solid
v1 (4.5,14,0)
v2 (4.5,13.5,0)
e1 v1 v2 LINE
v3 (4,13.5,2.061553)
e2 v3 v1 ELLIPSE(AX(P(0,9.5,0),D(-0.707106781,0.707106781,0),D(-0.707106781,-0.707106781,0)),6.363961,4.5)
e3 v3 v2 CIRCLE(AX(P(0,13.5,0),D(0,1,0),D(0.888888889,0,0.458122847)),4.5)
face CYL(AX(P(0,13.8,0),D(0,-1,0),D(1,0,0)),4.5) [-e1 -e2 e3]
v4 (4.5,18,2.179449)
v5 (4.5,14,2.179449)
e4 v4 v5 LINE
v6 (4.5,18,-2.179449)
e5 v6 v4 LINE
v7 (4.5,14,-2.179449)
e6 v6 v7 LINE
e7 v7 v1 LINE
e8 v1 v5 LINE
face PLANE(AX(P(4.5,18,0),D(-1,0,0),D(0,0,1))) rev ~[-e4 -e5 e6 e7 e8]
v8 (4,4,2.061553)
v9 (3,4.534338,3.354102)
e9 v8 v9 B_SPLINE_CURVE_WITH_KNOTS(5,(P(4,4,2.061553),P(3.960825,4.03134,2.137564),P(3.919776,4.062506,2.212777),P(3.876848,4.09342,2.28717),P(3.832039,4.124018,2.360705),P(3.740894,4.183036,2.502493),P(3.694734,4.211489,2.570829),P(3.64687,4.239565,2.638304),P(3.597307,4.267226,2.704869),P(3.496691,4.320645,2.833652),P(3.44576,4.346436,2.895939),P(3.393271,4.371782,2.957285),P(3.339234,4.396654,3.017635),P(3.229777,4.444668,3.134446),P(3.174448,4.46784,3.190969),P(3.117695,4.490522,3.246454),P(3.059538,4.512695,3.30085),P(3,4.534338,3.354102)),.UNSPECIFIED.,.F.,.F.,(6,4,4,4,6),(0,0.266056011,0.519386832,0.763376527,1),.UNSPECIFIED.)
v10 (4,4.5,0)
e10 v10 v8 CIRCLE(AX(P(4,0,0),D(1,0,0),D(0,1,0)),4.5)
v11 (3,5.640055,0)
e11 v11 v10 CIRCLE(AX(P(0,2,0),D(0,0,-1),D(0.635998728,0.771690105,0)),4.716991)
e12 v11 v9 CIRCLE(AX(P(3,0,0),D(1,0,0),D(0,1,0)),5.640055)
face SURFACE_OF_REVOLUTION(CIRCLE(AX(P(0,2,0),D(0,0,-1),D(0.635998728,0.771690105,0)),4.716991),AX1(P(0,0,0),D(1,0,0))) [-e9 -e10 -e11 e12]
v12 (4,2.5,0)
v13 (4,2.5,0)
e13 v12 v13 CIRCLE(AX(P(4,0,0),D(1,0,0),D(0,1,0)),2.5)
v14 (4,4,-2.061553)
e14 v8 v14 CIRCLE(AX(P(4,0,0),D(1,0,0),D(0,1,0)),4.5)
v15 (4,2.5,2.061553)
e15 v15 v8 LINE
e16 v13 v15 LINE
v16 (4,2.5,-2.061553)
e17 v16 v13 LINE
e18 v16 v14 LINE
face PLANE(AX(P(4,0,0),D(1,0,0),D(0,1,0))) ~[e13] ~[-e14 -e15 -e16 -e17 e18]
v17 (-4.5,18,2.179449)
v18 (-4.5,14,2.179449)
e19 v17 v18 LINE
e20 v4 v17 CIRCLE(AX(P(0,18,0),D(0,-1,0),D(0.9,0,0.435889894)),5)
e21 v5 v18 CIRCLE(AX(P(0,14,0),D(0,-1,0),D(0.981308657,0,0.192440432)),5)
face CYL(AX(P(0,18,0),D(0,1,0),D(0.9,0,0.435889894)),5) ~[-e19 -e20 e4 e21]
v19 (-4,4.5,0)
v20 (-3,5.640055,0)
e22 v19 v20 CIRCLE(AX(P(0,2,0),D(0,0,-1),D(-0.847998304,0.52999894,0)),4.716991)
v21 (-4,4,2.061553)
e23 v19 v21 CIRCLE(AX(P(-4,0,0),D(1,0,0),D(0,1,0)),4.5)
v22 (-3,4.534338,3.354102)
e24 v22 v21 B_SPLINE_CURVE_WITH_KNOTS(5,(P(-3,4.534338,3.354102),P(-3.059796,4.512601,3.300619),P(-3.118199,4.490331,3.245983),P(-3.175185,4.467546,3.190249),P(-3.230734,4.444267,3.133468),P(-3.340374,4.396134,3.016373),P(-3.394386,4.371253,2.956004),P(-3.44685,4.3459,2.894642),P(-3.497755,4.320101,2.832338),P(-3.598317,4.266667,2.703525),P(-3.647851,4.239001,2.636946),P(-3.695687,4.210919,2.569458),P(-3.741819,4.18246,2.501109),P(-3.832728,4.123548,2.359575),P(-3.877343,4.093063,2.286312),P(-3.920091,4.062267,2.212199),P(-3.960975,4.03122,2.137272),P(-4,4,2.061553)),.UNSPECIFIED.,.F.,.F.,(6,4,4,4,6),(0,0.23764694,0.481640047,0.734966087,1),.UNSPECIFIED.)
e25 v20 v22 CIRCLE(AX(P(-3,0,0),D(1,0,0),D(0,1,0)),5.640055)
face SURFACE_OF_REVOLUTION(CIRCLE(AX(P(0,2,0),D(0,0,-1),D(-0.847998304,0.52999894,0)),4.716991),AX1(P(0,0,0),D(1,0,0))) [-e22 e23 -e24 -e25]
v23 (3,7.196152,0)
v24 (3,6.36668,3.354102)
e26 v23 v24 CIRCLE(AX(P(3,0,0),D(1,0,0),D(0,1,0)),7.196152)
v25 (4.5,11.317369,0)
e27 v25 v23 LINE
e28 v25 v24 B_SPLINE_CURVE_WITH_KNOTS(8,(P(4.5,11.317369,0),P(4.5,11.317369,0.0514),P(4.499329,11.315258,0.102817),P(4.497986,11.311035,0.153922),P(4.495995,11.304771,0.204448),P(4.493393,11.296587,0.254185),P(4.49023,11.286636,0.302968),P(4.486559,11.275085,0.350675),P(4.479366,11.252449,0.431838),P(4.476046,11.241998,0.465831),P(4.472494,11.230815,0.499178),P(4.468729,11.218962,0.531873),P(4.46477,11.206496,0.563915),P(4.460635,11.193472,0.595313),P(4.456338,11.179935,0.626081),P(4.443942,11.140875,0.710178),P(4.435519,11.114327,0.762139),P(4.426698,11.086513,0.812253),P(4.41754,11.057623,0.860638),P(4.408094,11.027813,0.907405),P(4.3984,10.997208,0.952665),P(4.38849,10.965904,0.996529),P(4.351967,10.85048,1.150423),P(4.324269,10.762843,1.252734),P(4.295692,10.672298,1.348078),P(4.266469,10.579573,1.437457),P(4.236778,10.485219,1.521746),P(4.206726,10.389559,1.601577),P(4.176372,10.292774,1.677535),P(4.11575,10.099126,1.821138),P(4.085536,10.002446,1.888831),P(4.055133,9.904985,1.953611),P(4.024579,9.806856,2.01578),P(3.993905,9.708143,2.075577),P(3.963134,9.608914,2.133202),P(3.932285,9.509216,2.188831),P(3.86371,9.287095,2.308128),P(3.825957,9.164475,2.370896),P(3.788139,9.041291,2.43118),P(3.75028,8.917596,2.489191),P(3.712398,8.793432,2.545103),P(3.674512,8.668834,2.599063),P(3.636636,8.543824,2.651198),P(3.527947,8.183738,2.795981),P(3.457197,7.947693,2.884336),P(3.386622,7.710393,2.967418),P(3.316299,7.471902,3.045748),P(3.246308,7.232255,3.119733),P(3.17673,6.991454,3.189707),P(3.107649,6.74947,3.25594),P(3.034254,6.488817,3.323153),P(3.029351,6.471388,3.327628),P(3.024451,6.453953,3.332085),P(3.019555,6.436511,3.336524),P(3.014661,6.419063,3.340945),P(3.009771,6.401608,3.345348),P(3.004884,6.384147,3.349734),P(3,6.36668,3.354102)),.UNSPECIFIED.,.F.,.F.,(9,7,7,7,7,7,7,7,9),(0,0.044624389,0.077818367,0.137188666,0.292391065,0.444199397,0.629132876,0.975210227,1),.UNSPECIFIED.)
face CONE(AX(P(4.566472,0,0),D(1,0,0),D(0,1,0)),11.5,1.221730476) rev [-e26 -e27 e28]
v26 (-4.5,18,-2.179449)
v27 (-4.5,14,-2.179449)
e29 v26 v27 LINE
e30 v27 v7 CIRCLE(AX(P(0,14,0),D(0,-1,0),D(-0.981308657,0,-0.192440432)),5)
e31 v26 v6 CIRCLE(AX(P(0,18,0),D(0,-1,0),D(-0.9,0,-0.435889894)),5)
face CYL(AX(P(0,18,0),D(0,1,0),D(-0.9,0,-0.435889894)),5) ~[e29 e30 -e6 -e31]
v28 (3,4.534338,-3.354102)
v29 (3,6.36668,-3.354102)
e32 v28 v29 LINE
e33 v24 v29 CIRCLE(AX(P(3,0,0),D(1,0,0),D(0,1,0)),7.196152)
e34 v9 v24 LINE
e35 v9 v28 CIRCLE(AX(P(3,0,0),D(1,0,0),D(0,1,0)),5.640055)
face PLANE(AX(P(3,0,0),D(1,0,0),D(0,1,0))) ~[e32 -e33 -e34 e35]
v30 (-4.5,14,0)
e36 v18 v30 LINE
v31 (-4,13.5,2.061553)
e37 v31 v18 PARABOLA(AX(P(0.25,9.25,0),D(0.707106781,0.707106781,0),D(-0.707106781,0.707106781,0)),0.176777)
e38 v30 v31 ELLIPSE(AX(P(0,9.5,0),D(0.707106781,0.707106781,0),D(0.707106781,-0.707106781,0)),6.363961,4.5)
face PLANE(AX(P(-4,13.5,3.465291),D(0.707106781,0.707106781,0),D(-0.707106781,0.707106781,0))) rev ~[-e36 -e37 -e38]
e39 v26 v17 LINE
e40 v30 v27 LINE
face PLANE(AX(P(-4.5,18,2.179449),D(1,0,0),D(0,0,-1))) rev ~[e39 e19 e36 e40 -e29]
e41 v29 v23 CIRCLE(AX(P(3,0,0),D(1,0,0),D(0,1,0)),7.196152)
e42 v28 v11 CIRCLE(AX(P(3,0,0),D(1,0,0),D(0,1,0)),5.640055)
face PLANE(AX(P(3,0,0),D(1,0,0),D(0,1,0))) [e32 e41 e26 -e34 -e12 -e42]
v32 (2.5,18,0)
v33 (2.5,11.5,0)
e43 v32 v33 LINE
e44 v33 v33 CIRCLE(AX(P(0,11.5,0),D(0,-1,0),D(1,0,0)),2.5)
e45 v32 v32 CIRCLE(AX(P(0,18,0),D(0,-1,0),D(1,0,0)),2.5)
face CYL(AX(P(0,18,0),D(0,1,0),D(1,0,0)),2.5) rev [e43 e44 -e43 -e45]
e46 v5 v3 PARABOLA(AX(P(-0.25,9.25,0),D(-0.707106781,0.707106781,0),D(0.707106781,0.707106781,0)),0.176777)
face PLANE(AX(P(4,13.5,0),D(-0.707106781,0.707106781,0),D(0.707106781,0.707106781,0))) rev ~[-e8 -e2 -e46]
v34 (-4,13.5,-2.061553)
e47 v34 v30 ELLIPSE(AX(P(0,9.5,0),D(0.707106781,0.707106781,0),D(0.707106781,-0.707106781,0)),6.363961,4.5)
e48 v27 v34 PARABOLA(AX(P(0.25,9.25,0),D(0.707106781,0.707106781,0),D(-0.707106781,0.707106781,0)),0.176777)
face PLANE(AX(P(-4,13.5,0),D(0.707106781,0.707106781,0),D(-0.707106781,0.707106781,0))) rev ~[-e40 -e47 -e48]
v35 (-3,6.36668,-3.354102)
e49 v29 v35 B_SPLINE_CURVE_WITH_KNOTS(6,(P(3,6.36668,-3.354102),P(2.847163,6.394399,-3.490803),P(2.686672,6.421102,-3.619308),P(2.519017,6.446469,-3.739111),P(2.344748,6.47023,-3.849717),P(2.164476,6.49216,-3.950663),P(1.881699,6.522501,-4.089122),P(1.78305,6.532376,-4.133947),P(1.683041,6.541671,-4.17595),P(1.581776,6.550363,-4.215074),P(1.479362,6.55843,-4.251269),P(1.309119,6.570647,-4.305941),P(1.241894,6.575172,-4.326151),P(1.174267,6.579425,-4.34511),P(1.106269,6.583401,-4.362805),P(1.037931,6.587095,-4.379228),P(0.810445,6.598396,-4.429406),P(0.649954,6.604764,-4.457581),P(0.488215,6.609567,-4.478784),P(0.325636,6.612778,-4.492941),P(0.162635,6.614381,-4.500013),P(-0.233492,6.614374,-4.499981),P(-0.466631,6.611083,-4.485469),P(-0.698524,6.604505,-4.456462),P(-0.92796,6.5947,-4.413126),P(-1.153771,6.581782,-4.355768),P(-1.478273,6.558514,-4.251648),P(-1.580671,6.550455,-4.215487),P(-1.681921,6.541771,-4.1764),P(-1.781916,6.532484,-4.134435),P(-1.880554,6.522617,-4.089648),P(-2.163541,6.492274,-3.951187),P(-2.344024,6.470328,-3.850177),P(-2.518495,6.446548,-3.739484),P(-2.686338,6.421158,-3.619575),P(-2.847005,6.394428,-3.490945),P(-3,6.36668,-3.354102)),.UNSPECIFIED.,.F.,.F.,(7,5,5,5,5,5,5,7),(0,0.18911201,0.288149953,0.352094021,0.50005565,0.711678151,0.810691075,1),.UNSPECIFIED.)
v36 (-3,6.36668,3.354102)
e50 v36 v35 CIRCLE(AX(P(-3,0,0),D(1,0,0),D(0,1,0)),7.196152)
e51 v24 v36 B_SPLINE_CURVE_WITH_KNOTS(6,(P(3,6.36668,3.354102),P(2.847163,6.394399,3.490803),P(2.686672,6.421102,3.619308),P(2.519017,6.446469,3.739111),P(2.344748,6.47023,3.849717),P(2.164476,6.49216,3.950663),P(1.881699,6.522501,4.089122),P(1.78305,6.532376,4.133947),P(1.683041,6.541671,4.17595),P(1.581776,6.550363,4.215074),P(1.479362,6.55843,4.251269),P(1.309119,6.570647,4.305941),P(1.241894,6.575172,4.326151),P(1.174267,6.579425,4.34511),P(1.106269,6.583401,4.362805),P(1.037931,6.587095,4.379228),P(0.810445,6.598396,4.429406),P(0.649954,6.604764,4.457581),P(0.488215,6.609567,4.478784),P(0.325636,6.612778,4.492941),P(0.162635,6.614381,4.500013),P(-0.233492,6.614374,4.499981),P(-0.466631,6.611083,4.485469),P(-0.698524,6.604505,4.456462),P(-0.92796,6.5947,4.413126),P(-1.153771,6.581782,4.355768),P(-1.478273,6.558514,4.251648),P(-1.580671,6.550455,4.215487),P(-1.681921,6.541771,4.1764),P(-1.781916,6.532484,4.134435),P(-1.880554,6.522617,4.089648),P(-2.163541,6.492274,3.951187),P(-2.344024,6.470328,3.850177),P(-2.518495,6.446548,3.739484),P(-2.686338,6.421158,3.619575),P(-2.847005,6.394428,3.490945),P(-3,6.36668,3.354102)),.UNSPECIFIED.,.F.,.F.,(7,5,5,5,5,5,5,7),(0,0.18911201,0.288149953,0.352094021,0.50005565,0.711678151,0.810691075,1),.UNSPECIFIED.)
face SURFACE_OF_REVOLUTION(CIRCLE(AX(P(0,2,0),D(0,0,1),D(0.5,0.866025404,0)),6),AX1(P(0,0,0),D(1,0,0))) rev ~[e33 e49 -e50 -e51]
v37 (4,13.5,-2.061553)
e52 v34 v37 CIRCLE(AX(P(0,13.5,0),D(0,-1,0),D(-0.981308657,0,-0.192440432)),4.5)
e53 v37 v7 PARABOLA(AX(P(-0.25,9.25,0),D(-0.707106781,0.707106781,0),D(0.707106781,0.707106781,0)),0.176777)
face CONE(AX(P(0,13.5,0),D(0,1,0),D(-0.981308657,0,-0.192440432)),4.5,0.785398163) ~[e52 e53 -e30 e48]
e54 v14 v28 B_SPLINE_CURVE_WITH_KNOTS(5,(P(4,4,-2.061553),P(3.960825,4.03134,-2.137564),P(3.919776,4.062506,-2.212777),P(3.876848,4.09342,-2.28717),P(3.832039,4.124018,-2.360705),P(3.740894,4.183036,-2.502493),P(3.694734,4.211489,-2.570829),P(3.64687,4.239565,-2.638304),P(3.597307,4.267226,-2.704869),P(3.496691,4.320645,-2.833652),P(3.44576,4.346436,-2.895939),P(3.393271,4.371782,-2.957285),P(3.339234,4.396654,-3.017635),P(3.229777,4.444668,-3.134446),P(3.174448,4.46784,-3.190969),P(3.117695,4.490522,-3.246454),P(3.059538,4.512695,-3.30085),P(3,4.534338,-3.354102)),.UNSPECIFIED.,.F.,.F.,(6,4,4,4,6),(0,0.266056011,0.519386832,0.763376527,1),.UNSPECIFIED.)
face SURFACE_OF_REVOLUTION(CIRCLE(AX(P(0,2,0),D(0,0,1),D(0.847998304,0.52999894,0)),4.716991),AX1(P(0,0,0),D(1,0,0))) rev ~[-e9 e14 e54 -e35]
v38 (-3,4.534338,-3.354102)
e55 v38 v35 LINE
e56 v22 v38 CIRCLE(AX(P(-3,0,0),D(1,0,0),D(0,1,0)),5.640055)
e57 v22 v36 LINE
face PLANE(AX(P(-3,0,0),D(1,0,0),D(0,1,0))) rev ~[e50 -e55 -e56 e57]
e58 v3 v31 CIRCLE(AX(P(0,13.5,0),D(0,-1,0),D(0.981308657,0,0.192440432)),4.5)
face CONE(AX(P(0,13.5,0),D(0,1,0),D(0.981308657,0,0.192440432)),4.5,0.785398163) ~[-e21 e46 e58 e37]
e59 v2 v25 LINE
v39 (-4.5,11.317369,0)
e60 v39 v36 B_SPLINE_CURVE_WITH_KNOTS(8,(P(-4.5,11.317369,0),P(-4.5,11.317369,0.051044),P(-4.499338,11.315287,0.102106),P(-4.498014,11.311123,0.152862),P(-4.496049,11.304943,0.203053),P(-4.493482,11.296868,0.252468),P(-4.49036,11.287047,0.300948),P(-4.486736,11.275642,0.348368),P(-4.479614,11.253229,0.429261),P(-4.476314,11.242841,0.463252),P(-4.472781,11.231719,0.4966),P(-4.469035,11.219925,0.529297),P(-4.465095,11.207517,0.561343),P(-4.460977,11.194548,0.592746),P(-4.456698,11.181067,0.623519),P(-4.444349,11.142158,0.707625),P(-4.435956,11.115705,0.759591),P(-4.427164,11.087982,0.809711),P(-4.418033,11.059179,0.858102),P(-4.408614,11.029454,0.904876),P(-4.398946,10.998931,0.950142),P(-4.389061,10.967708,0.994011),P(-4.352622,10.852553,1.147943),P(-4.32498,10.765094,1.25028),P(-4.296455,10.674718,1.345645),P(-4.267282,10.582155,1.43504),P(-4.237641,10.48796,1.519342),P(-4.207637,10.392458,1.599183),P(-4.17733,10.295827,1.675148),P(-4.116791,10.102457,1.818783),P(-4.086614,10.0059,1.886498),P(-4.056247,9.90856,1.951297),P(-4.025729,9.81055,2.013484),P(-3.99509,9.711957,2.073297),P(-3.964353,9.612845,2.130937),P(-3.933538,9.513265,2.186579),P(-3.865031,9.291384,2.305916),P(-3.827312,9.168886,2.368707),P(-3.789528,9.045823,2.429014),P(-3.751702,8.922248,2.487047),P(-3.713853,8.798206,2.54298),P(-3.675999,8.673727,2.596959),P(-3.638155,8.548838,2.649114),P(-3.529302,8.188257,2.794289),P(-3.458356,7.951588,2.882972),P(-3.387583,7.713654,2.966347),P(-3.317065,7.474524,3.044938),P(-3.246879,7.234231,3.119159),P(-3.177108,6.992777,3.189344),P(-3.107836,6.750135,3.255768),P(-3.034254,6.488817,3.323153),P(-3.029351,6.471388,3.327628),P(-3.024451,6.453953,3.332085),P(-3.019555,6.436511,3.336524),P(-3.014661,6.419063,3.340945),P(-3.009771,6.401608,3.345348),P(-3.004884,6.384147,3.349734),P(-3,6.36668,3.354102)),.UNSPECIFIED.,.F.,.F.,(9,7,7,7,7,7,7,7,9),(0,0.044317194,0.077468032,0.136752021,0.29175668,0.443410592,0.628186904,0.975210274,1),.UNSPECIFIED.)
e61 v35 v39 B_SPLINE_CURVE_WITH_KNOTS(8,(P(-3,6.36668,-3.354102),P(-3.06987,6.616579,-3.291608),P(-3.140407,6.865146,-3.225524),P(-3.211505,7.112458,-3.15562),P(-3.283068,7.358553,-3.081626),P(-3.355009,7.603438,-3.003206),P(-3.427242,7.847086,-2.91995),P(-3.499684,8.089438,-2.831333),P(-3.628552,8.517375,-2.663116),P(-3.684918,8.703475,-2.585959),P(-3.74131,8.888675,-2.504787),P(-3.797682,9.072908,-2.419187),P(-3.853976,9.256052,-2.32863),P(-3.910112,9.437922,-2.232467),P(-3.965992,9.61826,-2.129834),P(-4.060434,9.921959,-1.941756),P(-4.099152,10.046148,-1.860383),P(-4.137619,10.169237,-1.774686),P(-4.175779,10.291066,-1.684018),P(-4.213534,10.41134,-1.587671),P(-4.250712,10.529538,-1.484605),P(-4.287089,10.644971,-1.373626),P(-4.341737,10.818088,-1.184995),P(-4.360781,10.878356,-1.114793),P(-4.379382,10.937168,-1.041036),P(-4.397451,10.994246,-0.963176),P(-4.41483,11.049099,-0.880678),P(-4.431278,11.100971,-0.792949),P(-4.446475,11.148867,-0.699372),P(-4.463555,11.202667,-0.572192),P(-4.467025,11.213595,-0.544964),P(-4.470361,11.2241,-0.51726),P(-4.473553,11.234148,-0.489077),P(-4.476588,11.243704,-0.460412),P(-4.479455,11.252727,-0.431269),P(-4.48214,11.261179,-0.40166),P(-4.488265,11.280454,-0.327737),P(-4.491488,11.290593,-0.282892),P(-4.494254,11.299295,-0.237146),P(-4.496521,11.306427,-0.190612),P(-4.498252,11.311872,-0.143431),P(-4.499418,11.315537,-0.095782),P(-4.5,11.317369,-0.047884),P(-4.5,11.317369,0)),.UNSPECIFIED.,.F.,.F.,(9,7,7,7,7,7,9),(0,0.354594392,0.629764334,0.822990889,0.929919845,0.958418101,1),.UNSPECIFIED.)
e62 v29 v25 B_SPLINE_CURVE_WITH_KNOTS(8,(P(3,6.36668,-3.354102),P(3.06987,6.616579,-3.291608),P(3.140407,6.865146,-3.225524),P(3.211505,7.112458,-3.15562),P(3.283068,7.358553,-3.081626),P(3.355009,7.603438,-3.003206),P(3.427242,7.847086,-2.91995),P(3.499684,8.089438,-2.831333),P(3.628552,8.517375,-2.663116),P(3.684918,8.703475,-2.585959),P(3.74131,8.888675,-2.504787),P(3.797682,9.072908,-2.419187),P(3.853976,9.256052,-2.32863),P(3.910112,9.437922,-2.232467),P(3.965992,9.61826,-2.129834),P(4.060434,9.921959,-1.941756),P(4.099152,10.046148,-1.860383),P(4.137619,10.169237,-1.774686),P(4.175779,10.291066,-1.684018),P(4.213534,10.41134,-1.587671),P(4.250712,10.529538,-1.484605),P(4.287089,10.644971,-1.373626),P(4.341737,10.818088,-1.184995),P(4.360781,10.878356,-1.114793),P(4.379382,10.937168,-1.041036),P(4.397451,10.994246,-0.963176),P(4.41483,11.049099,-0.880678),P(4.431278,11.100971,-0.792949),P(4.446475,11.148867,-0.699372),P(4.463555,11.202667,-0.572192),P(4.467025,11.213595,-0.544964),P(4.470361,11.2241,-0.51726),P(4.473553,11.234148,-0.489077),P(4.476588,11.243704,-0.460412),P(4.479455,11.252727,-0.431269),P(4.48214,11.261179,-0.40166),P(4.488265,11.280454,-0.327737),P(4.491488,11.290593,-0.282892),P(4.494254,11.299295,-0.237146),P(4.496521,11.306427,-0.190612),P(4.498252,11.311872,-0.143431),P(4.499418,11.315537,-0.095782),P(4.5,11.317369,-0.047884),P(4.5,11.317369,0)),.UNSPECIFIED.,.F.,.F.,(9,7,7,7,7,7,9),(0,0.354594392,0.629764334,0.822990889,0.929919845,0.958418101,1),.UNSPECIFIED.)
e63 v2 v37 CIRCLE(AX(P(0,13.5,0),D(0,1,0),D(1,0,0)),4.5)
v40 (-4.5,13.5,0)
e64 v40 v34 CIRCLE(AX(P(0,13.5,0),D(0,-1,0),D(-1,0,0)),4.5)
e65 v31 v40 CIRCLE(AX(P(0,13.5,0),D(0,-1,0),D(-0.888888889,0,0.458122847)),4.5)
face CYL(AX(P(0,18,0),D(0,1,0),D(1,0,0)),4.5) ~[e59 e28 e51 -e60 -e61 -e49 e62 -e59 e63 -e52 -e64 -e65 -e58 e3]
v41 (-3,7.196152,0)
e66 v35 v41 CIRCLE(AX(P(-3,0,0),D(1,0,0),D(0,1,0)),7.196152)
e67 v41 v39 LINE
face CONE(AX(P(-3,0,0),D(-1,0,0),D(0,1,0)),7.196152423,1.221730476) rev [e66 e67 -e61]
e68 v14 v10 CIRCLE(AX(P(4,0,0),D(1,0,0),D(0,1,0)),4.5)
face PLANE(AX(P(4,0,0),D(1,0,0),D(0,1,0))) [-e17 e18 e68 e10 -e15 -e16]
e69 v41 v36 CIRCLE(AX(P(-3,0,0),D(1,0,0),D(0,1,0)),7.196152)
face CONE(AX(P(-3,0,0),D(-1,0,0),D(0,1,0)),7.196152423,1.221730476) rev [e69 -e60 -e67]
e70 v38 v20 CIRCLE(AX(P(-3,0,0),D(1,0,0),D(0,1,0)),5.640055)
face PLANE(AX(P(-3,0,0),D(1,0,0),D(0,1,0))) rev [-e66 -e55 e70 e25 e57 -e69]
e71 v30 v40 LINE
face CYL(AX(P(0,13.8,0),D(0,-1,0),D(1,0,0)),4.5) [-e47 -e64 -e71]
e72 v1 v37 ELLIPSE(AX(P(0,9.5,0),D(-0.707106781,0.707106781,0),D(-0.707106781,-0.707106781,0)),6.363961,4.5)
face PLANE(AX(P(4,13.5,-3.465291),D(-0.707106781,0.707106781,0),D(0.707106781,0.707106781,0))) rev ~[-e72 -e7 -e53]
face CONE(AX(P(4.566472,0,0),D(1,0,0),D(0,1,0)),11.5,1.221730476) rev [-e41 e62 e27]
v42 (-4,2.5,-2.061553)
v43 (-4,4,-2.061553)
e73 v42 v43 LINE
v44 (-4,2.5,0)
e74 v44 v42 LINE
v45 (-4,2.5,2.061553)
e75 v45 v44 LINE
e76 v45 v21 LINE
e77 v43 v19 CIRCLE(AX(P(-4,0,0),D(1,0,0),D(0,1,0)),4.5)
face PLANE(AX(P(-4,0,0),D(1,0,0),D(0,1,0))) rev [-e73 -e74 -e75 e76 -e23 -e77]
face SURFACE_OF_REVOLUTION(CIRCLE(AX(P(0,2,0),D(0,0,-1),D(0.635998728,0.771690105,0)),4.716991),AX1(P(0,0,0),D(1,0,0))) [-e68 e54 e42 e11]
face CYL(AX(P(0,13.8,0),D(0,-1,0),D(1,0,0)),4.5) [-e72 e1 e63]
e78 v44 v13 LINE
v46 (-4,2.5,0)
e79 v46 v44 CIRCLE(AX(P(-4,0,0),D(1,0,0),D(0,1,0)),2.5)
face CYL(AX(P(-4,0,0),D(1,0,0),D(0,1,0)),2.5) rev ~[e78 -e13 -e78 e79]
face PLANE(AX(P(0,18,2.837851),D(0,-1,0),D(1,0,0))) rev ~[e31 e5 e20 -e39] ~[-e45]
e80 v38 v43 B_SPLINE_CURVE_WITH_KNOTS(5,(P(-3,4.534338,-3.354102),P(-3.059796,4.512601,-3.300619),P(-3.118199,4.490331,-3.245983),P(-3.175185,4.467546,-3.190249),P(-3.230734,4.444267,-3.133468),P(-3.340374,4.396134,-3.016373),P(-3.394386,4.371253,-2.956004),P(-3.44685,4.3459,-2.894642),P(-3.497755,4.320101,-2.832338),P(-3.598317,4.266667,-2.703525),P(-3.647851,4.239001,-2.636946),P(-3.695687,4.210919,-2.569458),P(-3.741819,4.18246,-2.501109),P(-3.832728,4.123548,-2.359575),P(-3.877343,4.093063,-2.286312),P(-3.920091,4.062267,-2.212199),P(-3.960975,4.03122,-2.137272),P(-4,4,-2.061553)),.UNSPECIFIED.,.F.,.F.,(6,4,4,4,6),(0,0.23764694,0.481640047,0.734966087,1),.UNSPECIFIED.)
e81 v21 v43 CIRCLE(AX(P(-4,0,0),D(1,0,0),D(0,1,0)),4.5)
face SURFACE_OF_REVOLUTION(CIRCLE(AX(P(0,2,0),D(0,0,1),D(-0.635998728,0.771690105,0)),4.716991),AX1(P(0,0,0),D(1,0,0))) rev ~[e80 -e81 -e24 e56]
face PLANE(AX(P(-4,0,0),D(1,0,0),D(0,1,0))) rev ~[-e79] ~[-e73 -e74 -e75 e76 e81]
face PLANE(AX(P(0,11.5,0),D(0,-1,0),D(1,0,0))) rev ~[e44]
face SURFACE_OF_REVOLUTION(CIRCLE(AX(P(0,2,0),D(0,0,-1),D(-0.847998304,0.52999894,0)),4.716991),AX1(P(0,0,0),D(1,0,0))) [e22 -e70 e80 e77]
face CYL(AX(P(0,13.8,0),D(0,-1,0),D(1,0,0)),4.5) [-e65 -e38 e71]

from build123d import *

# Parameters (mm, degrees)
F9_R          = 2.5
F10_DEPTH     = 15.5
F11_DEPTH     = 4.5
F12_DEPTH     = 6.5
F13_T2_ANGLE  = 157.8095212227
F13_T6_DEPTH  = 3.4652909658
F13_S7_R      = 4.5
F13_T8_DEPTH  = 3
F13_T12_DEPTH = 3.4652909658
F13_S13_R     = 4.5
F13_T14_DEPTH = 3
F13_T16_ANGLE = 157.8095212227
F13_T20_DEPTH = 3.4652909658
F13_S21_R     = 4.5
F13_T22_DEPTH = 3
F13_T26_DEPTH = 3.4652909658
F13_S27_R     = 4.5
F13_T28_DEPTH = 3


# Not quite as in the source:
# - a fillet or chamfer that OpenCascade refuses, or shapes differently, is made with other operations: its cross-section is extruded or revolved along the edge and cut away or added


with BuildPart() as f7:
    # F6 (on Top) → F7 (revolve)
    with BuildSketch(Plane.XY):
        with BuildLine():
            Line((-4, 4.5), (-4, 2.5))
            Line((-4, 2.5), (4, 2.5))
            Line((4, 2.5), (4, 4.5))
            ThreePointArc((4, 4.5), (3.5461149614, 5.1104772433), (3, 5.6400549446))
            ThreePointArc((3, 5.6400549446), (0, 6.716990566), (-3, 5.6400549446))
            ThreePointArc((-3, 5.6400549446), (-3.5461149614, 5.1104772433), (-4, 4.5))
        make_face()
        with BuildLine():
            Line((-3, 7.1961524227), (-3, 5.6400549446))
            ThreePointArc((-3, 5.6400549446), (0, 6.716990566), (3, 5.6400549446))
            Line((3, 5.6400549446), (3, 7.1961524227))
            ThreePointArc((3, 7.1961524227), (0, 8), (-3, 7.1961524227))
        make_face()
    revolve(axis=Axis((0, 0, 0), (1, 0, 0)))

    # F9 (on offset) → F10 (join)
    with BuildSketch(Plane.XZ.offset(-18)):
        with BuildLine():
            ThreePointArc((-4.5, 0), (0, -4.5), (4.5, 0))
            ThreePointArc((4.5, 0), (0, 4.5), (-4.5, 0))
        make_face()
        Circle(F9_R, mode=Mode.SUBTRACT)
        Circle(F9_R)
    extrude(amount=F10_DEPTH)

    # F9 (on offset) → F11 (join)
    with BuildSketch(Plane.XZ.offset(-18)):
        with BuildLine():
            ThreePointArc((-4.5, 0), (0, 4.5), (4.5, 0))
            Line((4.5, 0), (4.5, 2.1794494718))
            ThreePointArc((4.5, 2.1794494718), (0, 5), (-4.5, 2.1794494718))
            Line((-4.5, 2.1794494718), (-4.5, 0))
        make_face()
        with BuildLine():
            Line((4.5, -2.1794494718), (4.5, 0))
            ThreePointArc((4.5, 0), (0, -4.5), (-4.5, 0))
            Line((-4.5, 0), (-4.5, -2.1794494718))
            ThreePointArc((-4.5, -2.1794494718), (0, -5), (4.5, -2.1794494718))
        make_face()
    extrude(amount=F11_DEPTH)

    # F9 (on offset) → F12 (cut)
    with BuildSketch(Plane.XZ.offset(-18)):
        Circle(F9_R)
    extrude(amount=F12_DEPTH, mode=Mode.SUBTRACT)

    # F13: chamfer of 0.5 on 6 edges, made by hand

    # F13_s1 → F13_t2 (revolve, cut)
    with BuildSketch(Plane(origin=(0, 0, 0), x_dir=(0, 1, 0), z_dir=(0.1924404319, 0, -0.9813086569))):
        Polygon((13.5, 4.5), (14, 5), (13.5, 5), align=None)
    revolve(axis=Axis((0, 13.5, 0), (0, -1, 0)), revolution_arc=F13_T2_ANGLE, mode=Mode.SUBTRACT)


with BuildPart() as f13_tool4:
    # F13_s5 → F13_t6 (new body)
    with BuildSketch(Plane.XY):
        Polygon((4, 13.5), (4.5, 14), (4.5, 13.5), align=None)
    extrude(amount=F13_T6_DEPTH)

    # F13_s7 → F13_t8 (cut, symmetric)
    with BuildSketch(Plane.XZ.offset(-13.8)):
        Circle(F13_S7_R)
    extrude(amount=F13_T8_DEPTH, both=True, mode=Mode.SUBTRACT)


with BuildPart() as f7_1:
    add(f7.part)

    # F13_t3: cut F13_tool4
    add(f13_tool4.part, mode=Mode.SUBTRACT)


with BuildPart() as f13_tool10:
    # F13_s11 → F13_t12 (new body)
    with BuildSketch(Plane.XY.offset(3.4652909658)):
        Polygon((-4, 13.5), (-4.5, 14), (-4.5, 13.5), align=None)
    extrude(amount=-F13_T12_DEPTH)

    # F13_s13 → F13_t14 (cut, symmetric)
    with BuildSketch(Plane.XZ.offset(-13.8)):
        Circle(F13_S13_R)
    extrude(amount=F13_T14_DEPTH, both=True, mode=Mode.SUBTRACT)


with BuildPart() as f7_2:
    add(f7_1.part)

    # F13_t9: cut F13_tool10
    add(f13_tool10.part, mode=Mode.SUBTRACT)

    # F13_s15 → F13_t16 (revolve, cut)
    with BuildSketch(Plane(origin=(0, 0, 0), x_dir=(0, 1, 0), z_dir=(-0.1924404319, 0, 0.9813086569))):
        Polygon((13.5, 4.5), (14, 5), (13.5, 5), align=None)
    revolve(axis=Axis((0, 13.5, 0), (0, -1, 0)), revolution_arc=F13_T16_ANGLE, mode=Mode.SUBTRACT)


with BuildPart() as f13_tool18:
    # F13_s19 → F13_t20 (new body)
    with BuildSketch(Plane.XY.offset(-3.4652909658)):
        Polygon((4, 13.5), (4.5, 14), (4.5, 13.5), align=None)
    extrude(amount=F13_T20_DEPTH)

    # F13_s21 → F13_t22 (cut, symmetric)
    with BuildSketch(Plane.XZ.offset(-13.8)):
        Circle(F13_S21_R)
    extrude(amount=F13_T22_DEPTH, both=True, mode=Mode.SUBTRACT)


with BuildPart() as f7_3:
    add(f7_2.part)

    # F13_t17: cut F13_tool18
    add(f13_tool18.part, mode=Mode.SUBTRACT)


with BuildPart() as f13_tool24:
    # F13_s25 → F13_t26 (new body)
    with BuildSketch(Plane.XY):
        Polygon((-4, 13.5), (-4.5, 14), (-4.5, 13.5), align=None)
    extrude(amount=-F13_T26_DEPTH)

    # F13_s27 → F13_t28 (cut, symmetric)
    with BuildSketch(Plane.XZ.offset(-13.8)):
        Circle(F13_S27_R)
    extrude(amount=F13_T28_DEPTH, both=True, mode=Mode.SUBTRACT)


with BuildPart() as f7_4:
    add(f7_3.part)

    # F13_t23: cut F13_tool24
    add(f13_tool24.part, mode=Mode.SUBTRACT)

    # F6 (on Top) → F14 (revolve, cut)
    with BuildSketch(Plane.XY):
        with BuildLine():
            Line((4, 4.5), (4, 2.5))
            Line((4, 2.5), (6, 2.5))
            Line((6, 2.5), (6, 11.5))
            Line((6, 11.5), (4.566472411, 11.5))
            Line((4.566472411, 11.5), (3, 7.1961524227))
            Line((3, 7.1961524227), (3, 5.6400549446))
            ThreePointArc((3, 5.6400549446), (3.5461149614, 5.1104772433), (4, 4.5))
        make_face()
        with BuildLine():
            Line((-6, 2.5), (-4, 2.5))
            Line((-4, 2.5), (-4, 4.5))
            ThreePointArc((-4, 4.5), (-3.5461149614, 5.1104772433), (-3, 5.6400549446))
            Line((-3, 5.6400549446), (-3, 7.1961524227))
            Line((-3, 7.1961524227), (-4.566472411, 11.5))
            Line((-4.566472411, 11.5), (-6, 11.5))
            Line((-6, 11.5), (-6, 2.5))
        make_face()
    revolve(axis=Axis((0, 0, 0), (1, 0, 0)), mode=Mode.SUBTRACT)


solid = f7_4.part
